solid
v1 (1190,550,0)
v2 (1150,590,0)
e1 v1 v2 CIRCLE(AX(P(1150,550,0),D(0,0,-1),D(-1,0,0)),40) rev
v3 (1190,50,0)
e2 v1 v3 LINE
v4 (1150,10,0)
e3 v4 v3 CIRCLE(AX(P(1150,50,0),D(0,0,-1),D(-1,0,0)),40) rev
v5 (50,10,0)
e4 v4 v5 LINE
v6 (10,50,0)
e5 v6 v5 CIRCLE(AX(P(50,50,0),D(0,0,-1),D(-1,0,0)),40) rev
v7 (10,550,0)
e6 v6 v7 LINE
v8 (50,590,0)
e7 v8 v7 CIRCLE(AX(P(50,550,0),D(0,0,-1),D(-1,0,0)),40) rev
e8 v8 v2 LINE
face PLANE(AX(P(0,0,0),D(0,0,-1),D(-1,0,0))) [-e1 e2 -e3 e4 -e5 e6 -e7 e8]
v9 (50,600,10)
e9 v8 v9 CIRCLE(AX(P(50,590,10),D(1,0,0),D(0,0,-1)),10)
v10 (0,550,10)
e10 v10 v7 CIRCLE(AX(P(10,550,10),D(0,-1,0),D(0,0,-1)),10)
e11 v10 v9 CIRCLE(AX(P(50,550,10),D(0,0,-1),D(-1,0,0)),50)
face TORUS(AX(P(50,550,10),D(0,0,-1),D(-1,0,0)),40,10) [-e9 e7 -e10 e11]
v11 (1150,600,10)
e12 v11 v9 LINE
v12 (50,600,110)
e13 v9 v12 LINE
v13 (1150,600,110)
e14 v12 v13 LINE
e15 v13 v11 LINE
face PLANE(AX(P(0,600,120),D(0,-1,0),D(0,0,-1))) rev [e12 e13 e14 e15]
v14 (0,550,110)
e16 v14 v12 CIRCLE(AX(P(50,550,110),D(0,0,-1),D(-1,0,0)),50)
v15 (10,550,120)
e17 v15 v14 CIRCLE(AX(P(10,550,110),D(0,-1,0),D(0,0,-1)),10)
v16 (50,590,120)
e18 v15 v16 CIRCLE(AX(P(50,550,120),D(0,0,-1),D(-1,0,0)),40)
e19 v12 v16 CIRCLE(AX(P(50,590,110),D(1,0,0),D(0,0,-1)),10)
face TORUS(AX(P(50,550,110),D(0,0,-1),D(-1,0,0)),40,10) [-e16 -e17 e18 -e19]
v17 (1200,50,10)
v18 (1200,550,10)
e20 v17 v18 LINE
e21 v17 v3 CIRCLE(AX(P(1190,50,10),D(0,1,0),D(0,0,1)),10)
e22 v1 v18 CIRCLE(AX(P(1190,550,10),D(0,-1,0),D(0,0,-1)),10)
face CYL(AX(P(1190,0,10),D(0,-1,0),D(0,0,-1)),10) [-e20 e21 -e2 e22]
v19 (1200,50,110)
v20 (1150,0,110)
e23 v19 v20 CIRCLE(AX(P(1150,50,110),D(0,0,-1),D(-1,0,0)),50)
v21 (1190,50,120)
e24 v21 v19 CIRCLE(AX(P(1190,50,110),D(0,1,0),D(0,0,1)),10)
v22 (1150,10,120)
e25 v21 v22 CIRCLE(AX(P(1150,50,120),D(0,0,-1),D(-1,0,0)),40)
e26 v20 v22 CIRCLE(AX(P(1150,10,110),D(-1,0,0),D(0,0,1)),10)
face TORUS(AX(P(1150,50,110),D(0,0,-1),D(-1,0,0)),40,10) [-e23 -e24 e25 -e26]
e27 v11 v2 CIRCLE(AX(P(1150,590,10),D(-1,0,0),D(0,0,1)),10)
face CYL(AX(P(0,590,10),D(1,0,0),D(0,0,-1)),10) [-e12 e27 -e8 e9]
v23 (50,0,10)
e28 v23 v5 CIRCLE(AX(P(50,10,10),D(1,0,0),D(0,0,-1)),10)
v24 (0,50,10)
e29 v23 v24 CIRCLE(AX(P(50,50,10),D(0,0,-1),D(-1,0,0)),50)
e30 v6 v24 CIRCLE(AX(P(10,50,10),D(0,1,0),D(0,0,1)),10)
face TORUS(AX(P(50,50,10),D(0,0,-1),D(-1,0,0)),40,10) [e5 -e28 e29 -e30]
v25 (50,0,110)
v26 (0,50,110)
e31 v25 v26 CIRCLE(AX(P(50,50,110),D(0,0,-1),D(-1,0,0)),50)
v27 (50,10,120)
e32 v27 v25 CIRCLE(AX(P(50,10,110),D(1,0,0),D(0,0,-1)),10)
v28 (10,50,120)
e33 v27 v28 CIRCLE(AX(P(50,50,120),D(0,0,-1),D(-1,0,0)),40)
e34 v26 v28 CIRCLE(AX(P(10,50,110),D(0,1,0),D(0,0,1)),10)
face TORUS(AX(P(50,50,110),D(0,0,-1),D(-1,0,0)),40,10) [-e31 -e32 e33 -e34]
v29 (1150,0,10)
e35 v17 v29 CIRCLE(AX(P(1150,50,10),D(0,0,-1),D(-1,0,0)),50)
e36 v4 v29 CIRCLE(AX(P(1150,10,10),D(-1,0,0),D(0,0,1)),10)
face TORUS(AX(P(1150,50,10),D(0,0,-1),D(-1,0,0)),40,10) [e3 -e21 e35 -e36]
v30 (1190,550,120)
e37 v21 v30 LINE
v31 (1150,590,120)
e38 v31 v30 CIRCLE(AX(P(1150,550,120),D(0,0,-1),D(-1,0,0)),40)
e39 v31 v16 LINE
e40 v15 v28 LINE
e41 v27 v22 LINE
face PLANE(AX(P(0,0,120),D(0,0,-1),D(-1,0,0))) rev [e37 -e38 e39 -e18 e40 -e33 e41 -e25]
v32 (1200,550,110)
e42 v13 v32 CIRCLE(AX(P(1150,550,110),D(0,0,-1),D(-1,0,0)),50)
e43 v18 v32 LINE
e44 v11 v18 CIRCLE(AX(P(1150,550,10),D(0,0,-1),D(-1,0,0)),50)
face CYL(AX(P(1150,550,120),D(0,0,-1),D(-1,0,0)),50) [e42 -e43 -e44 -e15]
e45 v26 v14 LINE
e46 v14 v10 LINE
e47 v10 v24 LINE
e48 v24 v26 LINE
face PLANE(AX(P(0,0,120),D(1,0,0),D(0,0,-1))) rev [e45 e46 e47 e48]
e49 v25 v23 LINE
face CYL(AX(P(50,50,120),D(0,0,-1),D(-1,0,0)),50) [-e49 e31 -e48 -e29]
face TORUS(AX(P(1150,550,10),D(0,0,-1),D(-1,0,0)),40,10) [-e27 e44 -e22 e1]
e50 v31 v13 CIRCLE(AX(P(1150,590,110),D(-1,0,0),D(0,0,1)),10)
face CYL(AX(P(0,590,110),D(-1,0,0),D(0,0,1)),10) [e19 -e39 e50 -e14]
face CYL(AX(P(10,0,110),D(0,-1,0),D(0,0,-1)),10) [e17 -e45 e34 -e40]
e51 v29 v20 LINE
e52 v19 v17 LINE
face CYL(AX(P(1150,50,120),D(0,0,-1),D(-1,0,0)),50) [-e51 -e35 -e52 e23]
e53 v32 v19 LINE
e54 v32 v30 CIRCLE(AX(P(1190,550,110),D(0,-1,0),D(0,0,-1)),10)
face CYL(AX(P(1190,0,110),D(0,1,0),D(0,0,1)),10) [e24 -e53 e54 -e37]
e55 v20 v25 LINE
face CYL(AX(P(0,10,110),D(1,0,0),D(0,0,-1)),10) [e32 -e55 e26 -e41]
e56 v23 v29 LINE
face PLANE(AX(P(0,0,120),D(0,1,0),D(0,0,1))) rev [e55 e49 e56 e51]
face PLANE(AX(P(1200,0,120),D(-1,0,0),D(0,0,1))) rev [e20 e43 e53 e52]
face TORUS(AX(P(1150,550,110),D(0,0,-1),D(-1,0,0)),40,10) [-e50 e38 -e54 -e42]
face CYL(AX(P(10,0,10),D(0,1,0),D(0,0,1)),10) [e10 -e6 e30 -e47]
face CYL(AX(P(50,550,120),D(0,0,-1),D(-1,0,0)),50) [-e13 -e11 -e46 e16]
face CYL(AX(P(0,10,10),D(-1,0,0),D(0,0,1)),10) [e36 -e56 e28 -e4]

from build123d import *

# Parameters (mm, degrees)
ESQUISSE1_W        = 1200
ESQUISSE1_H        = 600
BOSS_EXTRU_1_DEPTH = 120
CONG_1_R           = 10
CONG_2_R           = 50


with BuildPart() as part:
    # Esquisse1 → Boss.-Extru.1 (new body)
    with BuildSketch(Plane.XY):
        with Locations((600, 300)):
            Rectangle(ESQUISSE1_W, ESQUISSE1_H)
    extrude(amount=BOSS_EXTRU_1_DEPTH)

    # Congé1
    cong_1_edges = [part.edges().sort_by_distance(p)[0] for p in [
        (1200, 300, 120),
        (600, 600, 120),
        (0, 300, 120),
        (600, 600, 0),
        (1200, 300, 0),
        (600, 0, 0),
        (0, 300, 0),
        (600, 0, 120),
    ]]
    fillet(cong_1_edges, radius=CONG_1_R)

    # Congé2
    # the kernel refuses this fillet: 50 mm, written as the material it takes off along each edge
    with BuildSketch(Plane(origin=(50, 550, 0), x_dir=(-1, 0, 0), z_dir=(0, -1, 0))) as cong_2_piece_1:
        with BuildLine():
            CenterArc((40, -10), 10, 0, 90)
            Line((50, -10), (50, 0))
            Line((50, 0), (40, 0))
        make_face()
    revolve(axis=Axis((50, 550, 0), (0, 0, -1)), revolution_arc=90, mode=Mode.SUBTRACT)
    with BuildSketch(Plane(origin=(1150, 550, 0), x_dir=(0, 1, 0), z_dir=(-1, 0, 0))) as cong_2_piece_2:
        with BuildLine():
            CenterArc((40, -10), 10, 0, 90)
            Line((50, -10), (50, 0))
            Line((50, 0), (40, 0))
        make_face()
    revolve(axis=Axis((1150, 550, 0), (0, 0, -1)), revolution_arc=90, mode=Mode.SUBTRACT)
    with BuildSketch(Plane(origin=(50, 50, 0), x_dir=(0, -1, 0), z_dir=(1, 0, 0))) as cong_2_piece_3:
        with BuildLine():
            CenterArc((40, -10), 10, 0, 90)
            Line((50, -10), (50, 0))
            Line((50, 0), (40, 0))
        make_face()
    revolve(axis=Axis((50, 50, 0), (0, 0, -1)), revolution_arc=90, mode=Mode.SUBTRACT)
    with BuildSketch(Plane(origin=(1150, 50, 0), x_dir=(1, 0, 0), z_dir=(0, 1, 0))) as cong_2_piece_4:
        with BuildLine():
            CenterArc((40, -10), 10, 0, 90)
            Line((50, -10), (50, 0))
            Line((50, 0), (40, 0))
        make_face()
    revolve(axis=Axis((1150, 50, 0), (0, 0, -1)), revolution_arc=90, mode=Mode.SUBTRACT)
    with BuildSketch(Plane(origin=(1150, 50, 120), x_dir=(0, -1, 0), z_dir=(-1, 0, 0))) as cong_2_piece_5:
        with BuildLine():
            CenterArc((40, -10), 10, 0, 90)
            Line((50, -10), (50, 0))
            Line((50, 0), (40, 0))
        make_face()
    revolve(axis=Axis((1150, 50, 120), (0, 0, 1)), revolution_arc=90, mode=Mode.SUBTRACT)
    with BuildSketch(Plane(origin=(50, 50, 120), x_dir=(-1, 0, 0), z_dir=(0, 1, 0))) as cong_2_piece_6:
        with BuildLine():
            CenterArc((40, -10), 10, 0, 90)
            Line((50, -10), (50, 0))
            Line((50, 0), (40, 0))
        make_face()
    revolve(axis=Axis((50, 50, 120), (0, 0, 1)), revolution_arc=90, mode=Mode.SUBTRACT)
    with BuildSketch(Plane(origin=(1150, 550, 120), x_dir=(1, 0, 0), z_dir=(0, -1, 0))) as cong_2_piece_7:
        with BuildLine():
            CenterArc((40, -10), 10, 0, 90)
            Line((50, -10), (50, 0))
            Line((50, 0), (40, 0))
        make_face()
    revolve(axis=Axis((1150, 550, 120), (0, 0, 1)), revolution_arc=90, mode=Mode.SUBTRACT)
    with BuildSketch(Plane(origin=(50, 550, 120), x_dir=(0, 1, 0), z_dir=(1, 0, 0))) as cong_2_piece_8:
        with BuildLine():
            CenterArc((40, -10), 10, 0, 90)
            Line((50, -10), (50, 0))
            Line((50, 0), (40, 0))
        make_face()
    revolve(axis=Axis((50, 550, 120), (0, 0, 1)), revolution_arc=90, mode=Mode.SUBTRACT)
    with BuildSketch(Plane(origin=(1200, 0, 0), x_dir=(-1, 0, 0), z_dir=(0, 0, 1)), Plane(origin=(1200, 600, 0), x_dir=(0, -1, 0), z_dir=(0, 0, 1))) as cong_2_piece_9:
        with BuildLine():
            CenterArc((CONG_2_R, -CONG_2_R), CONG_2_R, 90, 90)
            Line((0, -CONG_2_R), (0, 0))
            Line((0, 0), (CONG_2_R, 0))
        make_face()
    extrude(amount=120, mode=Mode.SUBTRACT)
    with BuildSketch(Plane(origin=(0, 0, 0), x_dir=(1, 0, 0), z_dir=(0, 0, 1)), Plane(origin=(0, 600, 0), x_dir=(0, -1, 0), z_dir=(0, 0, 1))) as cong_2_piece_10:
        with BuildLine():
            CenterArc((CONG_2_R, CONG_2_R), CONG_2_R, 180, 90)
            Line((0, CONG_2_R), (0, 0))
            Line((0, 0), (CONG_2_R, 0))
        make_face()
    extrude(amount=120, mode=Mode.SUBTRACT)


solid = part.part
